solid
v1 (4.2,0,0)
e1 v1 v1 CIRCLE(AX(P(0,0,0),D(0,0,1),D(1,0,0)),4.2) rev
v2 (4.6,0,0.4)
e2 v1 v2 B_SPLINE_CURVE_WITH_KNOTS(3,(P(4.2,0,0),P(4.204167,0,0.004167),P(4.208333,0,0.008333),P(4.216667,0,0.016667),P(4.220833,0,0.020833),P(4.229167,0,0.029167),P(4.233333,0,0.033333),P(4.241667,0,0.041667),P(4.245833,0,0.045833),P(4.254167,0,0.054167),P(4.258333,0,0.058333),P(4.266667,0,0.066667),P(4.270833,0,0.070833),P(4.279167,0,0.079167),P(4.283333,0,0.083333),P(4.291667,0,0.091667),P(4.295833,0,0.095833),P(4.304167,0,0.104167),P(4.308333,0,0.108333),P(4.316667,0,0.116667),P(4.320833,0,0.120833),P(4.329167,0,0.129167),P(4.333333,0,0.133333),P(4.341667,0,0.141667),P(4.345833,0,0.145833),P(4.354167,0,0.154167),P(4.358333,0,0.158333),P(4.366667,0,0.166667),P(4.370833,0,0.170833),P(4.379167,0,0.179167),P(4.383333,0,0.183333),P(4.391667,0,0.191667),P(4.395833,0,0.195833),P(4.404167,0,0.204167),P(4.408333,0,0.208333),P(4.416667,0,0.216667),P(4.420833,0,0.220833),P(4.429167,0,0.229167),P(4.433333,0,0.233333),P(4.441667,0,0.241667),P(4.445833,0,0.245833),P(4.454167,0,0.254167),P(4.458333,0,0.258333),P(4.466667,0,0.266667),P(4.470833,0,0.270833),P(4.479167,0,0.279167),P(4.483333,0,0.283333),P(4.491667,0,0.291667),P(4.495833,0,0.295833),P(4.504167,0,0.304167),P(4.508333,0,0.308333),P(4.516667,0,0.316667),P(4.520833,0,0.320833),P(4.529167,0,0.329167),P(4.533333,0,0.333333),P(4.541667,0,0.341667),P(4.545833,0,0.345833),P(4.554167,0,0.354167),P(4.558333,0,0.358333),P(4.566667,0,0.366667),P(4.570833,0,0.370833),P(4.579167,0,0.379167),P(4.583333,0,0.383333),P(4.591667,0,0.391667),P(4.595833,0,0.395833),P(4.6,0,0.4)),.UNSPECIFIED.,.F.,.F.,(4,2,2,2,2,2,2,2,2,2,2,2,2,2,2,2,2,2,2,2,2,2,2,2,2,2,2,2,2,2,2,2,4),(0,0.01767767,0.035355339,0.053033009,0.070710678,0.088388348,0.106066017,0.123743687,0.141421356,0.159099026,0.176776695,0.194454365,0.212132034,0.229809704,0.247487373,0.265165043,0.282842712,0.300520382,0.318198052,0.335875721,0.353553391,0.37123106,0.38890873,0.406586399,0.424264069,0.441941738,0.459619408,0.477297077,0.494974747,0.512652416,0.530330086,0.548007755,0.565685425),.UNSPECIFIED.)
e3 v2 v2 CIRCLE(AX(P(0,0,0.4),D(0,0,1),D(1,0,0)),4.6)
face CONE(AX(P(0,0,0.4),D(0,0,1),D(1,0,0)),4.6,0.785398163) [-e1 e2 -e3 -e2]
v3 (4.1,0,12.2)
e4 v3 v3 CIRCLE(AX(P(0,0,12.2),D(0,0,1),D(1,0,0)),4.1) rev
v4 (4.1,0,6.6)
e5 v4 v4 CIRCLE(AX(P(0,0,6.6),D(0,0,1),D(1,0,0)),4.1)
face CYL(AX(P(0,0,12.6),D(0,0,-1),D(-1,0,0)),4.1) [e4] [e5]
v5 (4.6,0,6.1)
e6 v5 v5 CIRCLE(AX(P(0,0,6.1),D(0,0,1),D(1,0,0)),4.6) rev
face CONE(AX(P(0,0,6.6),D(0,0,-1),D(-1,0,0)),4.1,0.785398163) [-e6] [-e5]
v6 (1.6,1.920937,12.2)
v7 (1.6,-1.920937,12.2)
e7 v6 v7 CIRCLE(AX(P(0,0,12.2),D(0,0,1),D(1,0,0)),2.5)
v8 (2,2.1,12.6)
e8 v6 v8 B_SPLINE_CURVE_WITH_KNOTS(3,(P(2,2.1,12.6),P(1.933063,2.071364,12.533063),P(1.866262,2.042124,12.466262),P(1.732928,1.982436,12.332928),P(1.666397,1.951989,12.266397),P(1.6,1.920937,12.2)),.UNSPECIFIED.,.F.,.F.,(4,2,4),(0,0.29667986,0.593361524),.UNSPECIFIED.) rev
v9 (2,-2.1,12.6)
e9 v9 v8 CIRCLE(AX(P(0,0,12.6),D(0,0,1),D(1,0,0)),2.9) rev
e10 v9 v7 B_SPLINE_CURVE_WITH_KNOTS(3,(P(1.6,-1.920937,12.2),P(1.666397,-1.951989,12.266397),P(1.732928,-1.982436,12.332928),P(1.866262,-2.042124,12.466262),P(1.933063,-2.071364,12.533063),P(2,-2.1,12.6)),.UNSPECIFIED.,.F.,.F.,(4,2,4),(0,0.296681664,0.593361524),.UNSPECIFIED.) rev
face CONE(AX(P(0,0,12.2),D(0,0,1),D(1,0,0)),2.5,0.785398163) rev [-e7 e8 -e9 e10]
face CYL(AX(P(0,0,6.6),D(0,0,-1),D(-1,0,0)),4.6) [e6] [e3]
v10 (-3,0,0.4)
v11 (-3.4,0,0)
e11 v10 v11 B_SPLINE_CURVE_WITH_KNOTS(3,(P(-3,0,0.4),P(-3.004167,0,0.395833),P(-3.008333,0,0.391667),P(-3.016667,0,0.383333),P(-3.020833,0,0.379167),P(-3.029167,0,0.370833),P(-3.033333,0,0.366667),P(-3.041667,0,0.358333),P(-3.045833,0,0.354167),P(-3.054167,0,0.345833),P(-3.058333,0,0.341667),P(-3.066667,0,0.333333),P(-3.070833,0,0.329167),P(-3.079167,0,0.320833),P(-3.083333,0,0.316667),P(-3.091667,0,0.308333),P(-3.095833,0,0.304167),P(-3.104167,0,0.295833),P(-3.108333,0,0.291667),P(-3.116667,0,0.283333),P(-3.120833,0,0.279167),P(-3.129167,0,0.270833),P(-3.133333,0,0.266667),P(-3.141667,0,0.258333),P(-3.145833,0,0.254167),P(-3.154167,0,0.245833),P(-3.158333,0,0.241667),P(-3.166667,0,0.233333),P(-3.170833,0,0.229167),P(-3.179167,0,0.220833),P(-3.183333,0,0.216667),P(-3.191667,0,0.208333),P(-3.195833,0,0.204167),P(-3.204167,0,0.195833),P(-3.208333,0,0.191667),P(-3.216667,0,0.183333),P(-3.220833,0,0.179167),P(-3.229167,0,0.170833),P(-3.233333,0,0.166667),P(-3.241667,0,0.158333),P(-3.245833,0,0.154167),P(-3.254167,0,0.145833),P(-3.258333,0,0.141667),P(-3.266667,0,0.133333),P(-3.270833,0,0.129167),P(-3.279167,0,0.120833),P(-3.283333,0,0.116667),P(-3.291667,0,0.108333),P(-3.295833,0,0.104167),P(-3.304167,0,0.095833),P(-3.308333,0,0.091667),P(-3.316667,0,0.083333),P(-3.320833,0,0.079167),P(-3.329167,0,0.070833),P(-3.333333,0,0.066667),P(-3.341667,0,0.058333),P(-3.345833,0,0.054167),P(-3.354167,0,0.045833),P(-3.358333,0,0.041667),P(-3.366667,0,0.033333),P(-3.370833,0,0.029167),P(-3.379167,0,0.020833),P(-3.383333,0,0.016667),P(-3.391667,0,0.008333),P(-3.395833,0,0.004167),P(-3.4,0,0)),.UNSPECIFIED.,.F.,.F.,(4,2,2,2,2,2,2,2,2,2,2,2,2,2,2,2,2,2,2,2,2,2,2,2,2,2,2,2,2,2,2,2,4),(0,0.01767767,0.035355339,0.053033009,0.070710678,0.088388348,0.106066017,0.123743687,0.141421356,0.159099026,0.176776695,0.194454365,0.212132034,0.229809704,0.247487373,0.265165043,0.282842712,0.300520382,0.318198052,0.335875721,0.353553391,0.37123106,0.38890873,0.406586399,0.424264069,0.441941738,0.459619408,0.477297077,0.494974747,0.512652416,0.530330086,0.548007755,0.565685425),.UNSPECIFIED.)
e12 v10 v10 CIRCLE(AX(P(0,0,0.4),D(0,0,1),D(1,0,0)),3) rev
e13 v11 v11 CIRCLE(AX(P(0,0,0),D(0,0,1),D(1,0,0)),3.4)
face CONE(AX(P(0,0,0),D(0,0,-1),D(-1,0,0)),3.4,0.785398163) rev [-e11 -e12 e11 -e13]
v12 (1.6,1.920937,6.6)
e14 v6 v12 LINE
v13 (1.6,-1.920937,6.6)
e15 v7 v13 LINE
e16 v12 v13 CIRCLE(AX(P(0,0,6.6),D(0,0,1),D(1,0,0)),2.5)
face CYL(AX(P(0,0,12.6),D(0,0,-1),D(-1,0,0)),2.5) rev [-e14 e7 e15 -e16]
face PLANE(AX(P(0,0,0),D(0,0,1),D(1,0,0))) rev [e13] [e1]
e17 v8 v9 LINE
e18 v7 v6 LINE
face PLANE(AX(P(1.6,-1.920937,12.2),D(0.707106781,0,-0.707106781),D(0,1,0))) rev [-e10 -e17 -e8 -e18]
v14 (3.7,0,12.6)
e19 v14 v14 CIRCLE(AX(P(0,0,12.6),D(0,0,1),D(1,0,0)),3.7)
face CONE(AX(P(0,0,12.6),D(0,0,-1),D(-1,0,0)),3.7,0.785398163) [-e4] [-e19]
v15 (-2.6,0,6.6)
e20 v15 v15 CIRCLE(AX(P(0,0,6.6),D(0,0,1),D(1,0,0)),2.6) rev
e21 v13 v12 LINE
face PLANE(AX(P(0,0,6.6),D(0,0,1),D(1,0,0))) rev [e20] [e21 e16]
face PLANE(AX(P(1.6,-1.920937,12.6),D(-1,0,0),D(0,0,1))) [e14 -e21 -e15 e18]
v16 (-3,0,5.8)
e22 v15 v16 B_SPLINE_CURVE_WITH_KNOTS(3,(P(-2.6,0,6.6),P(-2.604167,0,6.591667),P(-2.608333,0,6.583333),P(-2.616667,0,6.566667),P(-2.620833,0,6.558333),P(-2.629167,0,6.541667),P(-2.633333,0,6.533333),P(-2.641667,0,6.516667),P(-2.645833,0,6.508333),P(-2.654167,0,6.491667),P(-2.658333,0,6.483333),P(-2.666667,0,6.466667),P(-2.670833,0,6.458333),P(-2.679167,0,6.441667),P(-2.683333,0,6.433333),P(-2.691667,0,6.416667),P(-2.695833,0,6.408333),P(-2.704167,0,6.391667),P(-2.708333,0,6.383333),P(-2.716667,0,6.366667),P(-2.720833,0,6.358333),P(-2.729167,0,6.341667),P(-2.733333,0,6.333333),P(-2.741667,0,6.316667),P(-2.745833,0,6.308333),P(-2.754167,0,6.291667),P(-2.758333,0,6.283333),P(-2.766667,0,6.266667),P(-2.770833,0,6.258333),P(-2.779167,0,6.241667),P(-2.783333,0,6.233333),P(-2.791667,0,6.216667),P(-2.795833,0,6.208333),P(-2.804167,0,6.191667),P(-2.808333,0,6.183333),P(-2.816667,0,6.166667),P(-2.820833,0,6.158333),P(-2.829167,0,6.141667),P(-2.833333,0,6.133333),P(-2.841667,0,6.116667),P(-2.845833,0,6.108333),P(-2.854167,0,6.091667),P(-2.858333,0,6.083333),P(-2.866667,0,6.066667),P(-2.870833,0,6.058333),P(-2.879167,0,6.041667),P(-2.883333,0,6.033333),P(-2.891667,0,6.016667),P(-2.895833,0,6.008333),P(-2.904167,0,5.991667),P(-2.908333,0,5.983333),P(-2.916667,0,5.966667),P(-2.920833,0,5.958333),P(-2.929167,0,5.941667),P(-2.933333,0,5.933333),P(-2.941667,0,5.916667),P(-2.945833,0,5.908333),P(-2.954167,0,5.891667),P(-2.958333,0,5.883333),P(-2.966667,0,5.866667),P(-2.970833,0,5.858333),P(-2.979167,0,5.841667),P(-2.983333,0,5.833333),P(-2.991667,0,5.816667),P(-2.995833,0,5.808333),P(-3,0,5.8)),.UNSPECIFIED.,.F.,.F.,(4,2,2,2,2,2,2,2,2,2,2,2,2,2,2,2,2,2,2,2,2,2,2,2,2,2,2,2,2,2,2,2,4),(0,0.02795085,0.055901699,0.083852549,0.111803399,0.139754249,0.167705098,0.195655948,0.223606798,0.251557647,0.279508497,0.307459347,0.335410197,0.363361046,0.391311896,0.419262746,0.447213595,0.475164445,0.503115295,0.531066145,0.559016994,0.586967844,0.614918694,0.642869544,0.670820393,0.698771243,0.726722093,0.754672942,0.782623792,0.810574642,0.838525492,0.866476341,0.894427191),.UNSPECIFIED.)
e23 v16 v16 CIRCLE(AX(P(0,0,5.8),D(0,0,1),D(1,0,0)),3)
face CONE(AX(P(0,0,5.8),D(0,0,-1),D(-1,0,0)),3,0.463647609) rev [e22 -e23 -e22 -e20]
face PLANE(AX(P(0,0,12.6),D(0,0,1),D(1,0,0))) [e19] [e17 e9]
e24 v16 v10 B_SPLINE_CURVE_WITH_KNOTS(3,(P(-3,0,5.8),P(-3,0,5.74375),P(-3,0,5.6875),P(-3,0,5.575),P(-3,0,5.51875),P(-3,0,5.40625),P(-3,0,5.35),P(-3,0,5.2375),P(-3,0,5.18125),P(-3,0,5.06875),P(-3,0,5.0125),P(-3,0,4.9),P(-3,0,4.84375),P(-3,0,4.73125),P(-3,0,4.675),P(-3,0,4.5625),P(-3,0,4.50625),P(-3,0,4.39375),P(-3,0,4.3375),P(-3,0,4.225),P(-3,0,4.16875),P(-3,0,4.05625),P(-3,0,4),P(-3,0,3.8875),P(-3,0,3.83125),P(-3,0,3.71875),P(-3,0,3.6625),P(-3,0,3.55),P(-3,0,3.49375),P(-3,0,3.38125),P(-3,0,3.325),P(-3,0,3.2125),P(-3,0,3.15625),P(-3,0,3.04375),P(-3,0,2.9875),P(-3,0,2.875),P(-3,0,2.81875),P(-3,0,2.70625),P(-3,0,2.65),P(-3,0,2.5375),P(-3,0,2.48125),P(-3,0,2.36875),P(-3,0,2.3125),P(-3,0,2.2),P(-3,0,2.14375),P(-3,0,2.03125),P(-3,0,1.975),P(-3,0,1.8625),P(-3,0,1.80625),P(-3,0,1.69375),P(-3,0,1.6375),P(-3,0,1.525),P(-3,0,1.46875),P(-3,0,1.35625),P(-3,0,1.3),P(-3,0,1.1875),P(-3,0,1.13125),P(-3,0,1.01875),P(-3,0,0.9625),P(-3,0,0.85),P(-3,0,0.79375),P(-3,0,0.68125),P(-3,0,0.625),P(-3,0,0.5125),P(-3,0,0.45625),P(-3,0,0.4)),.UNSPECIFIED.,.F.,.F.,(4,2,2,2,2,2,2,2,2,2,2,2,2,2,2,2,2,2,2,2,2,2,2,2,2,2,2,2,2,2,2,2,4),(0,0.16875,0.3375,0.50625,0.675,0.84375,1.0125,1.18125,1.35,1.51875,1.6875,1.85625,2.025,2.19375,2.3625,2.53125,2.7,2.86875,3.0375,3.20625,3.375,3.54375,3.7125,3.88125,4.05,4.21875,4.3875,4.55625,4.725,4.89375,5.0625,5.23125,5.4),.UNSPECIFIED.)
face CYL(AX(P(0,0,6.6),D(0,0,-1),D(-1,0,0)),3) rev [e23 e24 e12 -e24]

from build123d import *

# Parameters (mm, degrees)
SKETCH1_R           = 4.6
SKETCH1_R_2         = 3
BOSS_EXTRUDE1_DEPTH = 6.6
SKETCH2_R           = 4.1
BOSS_EXTRUDE2_DEPTH = 6
CHAMFER2_SIZE       = 0.5
CHAMFER3_SIZE       = 0.4
CHAMFER4_SIZE       = 0.4
CHAMFER4_SIZE2      = 0.8
CHAMFER5_SIZE       = 0.4


with BuildPart() as part:
    # Sketch1 → Boss-Extrude1 (new body)
    with BuildSketch(Plane.XY):
        Circle(SKETCH1_R)
        Circle(SKETCH1_R_2, mode=Mode.SUBTRACT)
    extrude(amount=BOSS_EXTRUDE1_DEPTH)

    # Sketch2 → Boss-Extrude2 (add)
    with BuildSketch(Plane.XY.offset(6.6)):
        Circle(SKETCH2_R)
        with BuildLine():
            Line((1.6, -1.920937271), (1.6, 1.920937271))
            ThreePointArc((1.6, 1.920937271), (-2.5, 0), (1.6, -1.920937271))
        make_face(mode=Mode.SUBTRACT)
    extrude(amount=BOSS_EXTRUDE2_DEPTH)

    # Chamfer2
    chamfer2_edges = [part.edges().sort_by_distance(p)[0] for p in [
        (-4.6, 0, 6.6),
    ]]
    chamfer(chamfer2_edges, length=CHAMFER2_SIZE - 0.0001)  # a hair under: the kernel refuses the full size

    # Chamfer3
    chamfer3_edges = [part.edges().sort_by_distance(p)[0] for p in [
        (-2.5, 0, 12.6),
        (1.6, 0, 12.6),
        (-3, 0, 0),
    ]]
    chamfer(chamfer3_edges, length=CHAMFER3_SIZE)

    # Chamfer4
    chamfer4_edges = [part.edges().sort_by_distance(p)[0] for p in [
        (-3, 0, 6.6),
    ]]
    chamfer4_side = [part.faces().sort_by_distance(p)[0] for p in [
        (-2.915147186, 0, 6.6),
    ]]
    chamfer(chamfer4_edges, length=CHAMFER4_SIZE, length2=CHAMFER4_SIZE2, reference=chamfer4_side[0])

    # Chamfer5
    chamfer5_edges = [part.edges().sort_by_distance(p)[0] for p in [
        (-4.1, 0, 12.6),
        (-4.6, 0, 0),
    ]]
    chamfer(chamfer5_edges, length=CHAMFER5_SIZE)


solid = part.part
